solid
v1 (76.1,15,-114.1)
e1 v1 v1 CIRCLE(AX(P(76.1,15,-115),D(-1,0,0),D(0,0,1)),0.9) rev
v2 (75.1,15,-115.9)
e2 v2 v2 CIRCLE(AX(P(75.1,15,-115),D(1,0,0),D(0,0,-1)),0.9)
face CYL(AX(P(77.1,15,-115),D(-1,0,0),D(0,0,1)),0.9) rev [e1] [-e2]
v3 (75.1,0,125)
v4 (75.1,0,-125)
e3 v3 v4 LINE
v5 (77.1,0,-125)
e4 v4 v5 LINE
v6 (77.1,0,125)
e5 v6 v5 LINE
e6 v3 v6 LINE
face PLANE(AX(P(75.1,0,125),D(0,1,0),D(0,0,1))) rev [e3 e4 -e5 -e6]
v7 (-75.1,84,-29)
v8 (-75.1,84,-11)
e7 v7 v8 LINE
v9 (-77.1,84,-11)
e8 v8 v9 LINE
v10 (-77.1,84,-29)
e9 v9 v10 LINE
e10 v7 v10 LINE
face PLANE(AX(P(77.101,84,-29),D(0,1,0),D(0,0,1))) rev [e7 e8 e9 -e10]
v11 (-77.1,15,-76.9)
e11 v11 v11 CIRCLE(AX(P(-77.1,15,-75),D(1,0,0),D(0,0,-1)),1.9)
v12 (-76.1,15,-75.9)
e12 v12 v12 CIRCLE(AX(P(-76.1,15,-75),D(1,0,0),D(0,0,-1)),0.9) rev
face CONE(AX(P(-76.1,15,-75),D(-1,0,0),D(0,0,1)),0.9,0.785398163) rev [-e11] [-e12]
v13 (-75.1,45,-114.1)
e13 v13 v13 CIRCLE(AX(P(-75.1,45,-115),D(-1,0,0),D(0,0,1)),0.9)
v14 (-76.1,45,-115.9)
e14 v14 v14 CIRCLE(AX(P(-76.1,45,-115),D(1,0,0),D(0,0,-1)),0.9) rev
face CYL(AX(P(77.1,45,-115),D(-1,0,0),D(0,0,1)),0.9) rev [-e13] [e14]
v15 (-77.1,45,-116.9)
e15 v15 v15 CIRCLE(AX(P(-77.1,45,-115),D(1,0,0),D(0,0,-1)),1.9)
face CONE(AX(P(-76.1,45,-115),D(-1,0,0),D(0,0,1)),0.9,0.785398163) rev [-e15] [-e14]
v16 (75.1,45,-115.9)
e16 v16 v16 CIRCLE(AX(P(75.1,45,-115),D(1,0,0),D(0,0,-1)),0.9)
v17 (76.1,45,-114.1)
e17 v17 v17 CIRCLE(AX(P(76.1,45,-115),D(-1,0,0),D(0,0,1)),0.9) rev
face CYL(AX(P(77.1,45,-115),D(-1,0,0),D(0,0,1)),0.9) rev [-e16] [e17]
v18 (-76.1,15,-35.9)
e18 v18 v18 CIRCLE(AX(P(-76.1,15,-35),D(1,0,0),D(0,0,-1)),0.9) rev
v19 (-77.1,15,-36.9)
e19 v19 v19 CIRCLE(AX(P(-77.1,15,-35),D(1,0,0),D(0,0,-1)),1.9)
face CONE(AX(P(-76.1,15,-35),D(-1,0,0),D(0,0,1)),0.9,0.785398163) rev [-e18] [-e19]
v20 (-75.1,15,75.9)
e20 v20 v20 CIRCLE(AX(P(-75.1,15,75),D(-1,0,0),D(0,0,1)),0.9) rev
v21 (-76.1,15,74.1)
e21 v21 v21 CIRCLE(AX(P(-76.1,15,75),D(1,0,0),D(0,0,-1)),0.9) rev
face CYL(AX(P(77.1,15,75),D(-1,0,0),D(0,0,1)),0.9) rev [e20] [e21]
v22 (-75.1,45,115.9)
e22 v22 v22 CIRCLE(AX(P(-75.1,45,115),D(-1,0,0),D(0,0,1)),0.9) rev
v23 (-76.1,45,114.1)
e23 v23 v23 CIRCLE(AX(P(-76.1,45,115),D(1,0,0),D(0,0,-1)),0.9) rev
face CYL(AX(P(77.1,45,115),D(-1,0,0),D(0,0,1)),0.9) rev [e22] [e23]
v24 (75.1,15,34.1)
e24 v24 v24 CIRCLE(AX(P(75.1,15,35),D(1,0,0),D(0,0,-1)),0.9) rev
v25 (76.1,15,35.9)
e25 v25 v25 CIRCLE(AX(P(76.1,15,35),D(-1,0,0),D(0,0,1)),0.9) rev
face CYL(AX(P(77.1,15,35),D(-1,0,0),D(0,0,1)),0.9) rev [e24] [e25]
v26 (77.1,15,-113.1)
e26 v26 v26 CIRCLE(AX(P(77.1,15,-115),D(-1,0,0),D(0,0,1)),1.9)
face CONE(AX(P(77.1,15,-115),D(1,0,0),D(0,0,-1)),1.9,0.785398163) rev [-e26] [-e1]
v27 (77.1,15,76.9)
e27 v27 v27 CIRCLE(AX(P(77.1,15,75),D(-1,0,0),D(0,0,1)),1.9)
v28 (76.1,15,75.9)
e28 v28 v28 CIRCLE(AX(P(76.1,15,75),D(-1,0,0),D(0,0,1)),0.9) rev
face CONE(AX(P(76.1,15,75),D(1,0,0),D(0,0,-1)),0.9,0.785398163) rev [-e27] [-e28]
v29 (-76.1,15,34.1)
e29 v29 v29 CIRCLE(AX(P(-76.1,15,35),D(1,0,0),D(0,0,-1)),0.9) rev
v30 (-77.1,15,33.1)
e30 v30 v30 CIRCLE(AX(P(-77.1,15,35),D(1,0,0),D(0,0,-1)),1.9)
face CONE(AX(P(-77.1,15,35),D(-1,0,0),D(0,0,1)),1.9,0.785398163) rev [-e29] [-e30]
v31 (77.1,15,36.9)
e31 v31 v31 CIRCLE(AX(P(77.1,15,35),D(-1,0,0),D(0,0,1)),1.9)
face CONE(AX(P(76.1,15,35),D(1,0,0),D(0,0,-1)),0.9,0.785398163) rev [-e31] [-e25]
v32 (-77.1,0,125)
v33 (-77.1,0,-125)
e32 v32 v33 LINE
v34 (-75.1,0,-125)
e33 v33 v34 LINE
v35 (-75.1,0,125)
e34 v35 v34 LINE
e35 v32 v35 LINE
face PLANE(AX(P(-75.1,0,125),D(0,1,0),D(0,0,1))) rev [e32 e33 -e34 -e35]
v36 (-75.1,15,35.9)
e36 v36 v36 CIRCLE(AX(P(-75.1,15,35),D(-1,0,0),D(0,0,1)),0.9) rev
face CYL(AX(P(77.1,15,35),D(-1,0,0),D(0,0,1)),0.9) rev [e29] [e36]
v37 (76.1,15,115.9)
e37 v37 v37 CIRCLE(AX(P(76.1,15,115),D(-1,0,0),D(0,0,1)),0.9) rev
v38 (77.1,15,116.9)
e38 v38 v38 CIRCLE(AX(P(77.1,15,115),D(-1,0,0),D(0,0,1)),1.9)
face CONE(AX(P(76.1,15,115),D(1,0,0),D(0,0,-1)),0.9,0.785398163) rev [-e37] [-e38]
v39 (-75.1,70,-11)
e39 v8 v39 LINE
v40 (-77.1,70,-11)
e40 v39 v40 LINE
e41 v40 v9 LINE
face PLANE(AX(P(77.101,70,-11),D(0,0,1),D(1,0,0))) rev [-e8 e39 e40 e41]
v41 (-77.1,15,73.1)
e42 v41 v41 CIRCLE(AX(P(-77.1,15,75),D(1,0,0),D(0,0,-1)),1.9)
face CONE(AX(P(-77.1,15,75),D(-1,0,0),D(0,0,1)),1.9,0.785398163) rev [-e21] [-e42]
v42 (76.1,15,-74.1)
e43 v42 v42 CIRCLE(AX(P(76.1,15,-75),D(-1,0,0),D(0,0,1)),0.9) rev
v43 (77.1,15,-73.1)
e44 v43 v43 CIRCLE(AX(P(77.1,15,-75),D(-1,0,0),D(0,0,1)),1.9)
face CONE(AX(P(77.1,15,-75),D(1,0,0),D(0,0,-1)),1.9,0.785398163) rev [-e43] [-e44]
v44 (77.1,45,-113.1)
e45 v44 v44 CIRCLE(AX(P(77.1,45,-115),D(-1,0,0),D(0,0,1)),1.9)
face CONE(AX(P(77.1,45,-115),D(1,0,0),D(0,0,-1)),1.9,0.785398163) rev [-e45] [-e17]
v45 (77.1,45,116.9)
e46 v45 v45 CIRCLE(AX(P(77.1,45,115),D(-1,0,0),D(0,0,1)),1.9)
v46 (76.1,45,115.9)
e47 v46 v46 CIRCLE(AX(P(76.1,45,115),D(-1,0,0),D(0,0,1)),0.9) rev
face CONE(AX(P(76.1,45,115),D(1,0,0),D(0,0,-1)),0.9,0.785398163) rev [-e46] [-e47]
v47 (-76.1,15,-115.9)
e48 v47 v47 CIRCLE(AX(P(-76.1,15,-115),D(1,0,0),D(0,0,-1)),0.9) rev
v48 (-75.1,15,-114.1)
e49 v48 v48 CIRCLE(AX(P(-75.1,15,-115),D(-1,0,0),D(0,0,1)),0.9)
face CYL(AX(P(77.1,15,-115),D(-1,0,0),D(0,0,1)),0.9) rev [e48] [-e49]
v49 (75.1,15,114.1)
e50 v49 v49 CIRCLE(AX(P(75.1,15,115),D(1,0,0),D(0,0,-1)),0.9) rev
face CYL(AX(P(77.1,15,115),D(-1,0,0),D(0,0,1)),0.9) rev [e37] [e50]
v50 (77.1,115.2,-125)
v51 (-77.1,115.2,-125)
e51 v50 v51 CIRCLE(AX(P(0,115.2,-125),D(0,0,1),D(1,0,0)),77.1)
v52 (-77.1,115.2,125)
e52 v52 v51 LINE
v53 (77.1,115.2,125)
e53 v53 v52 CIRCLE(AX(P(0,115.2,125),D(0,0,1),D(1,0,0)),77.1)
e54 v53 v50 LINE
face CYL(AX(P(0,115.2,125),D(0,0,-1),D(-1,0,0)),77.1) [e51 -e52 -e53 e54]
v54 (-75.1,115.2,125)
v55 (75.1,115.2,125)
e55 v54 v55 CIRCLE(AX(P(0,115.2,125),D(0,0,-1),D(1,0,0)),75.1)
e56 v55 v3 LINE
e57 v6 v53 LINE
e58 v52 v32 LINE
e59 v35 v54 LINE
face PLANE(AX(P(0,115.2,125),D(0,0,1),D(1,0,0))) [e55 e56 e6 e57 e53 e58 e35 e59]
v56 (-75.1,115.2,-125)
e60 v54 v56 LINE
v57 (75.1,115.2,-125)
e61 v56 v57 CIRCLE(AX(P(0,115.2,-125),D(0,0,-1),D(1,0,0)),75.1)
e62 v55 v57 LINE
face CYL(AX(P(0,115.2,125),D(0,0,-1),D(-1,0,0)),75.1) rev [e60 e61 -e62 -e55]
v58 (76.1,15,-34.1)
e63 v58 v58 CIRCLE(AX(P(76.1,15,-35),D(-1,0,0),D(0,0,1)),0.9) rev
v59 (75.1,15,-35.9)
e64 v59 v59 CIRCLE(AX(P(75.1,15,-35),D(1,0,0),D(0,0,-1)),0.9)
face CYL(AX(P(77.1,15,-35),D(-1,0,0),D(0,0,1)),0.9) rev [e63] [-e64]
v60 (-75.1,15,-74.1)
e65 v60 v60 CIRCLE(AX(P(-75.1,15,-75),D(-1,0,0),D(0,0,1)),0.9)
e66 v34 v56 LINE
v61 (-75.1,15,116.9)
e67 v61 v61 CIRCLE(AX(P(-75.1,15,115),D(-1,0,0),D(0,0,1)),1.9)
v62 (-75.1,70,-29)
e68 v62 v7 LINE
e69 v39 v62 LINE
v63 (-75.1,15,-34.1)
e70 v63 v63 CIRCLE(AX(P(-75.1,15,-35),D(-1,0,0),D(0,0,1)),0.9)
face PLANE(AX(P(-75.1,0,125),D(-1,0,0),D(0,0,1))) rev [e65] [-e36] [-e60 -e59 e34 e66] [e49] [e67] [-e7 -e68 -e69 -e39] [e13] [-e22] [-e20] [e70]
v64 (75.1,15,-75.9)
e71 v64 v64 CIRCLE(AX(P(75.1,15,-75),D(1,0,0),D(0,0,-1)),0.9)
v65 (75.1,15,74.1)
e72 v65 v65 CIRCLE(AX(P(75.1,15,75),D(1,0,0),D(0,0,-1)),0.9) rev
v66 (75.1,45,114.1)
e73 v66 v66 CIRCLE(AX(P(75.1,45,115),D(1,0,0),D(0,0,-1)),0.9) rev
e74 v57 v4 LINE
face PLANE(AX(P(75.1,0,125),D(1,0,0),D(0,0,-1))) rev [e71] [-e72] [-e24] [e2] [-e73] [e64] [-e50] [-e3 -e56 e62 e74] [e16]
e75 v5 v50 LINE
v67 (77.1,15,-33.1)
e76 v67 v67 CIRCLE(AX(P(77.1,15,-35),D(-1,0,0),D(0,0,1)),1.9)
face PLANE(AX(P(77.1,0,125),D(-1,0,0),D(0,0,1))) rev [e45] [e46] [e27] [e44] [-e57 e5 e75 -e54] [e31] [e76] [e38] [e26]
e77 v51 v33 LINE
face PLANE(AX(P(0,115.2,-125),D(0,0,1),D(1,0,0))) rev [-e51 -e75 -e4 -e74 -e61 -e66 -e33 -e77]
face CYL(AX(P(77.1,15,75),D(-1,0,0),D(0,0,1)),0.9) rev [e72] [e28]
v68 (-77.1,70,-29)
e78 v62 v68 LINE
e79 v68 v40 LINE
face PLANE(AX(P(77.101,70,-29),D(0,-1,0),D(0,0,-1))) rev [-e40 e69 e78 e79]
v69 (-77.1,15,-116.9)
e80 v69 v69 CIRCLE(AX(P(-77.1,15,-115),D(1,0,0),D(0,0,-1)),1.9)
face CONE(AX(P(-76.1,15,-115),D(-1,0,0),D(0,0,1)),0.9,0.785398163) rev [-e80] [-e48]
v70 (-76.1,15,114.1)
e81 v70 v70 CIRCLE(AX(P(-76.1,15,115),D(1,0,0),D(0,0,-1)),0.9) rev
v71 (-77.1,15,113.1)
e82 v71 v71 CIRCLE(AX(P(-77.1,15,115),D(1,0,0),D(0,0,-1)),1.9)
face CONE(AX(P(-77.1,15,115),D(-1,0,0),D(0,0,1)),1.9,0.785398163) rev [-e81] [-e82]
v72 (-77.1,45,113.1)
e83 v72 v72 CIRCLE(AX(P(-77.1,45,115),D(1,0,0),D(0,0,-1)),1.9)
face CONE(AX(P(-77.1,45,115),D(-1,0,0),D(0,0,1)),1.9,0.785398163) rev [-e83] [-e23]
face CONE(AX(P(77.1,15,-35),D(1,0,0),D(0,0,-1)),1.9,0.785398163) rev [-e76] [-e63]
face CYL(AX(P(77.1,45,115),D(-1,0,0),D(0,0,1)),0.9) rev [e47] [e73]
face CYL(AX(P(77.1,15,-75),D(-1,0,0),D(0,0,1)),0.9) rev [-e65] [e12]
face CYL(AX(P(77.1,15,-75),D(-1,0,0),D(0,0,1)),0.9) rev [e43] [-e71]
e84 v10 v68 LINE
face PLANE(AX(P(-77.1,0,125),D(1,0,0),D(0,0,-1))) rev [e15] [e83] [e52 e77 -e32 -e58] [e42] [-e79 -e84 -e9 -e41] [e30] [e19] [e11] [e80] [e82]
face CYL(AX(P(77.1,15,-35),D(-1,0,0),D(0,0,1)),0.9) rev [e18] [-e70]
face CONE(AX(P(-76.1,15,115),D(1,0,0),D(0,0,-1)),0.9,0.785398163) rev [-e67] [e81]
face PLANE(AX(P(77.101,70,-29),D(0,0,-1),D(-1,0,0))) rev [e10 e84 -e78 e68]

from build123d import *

# Parameters (mm, degrees)
BOSS_EXTRUDE1_DEPTH = 125
SKETCH3_R           = 0.9
CUT_EXTRUDE1_DEPTH  = 277.372809806
CHAMFER1_SIZE       = 1
CHAMFER2_SIZE       = 1
CUT_EXTRUDE2_REACH  = 278.373
SKETCH4_W           = 18
SKETCH4_H           = 14


with BuildPart() as part:
    # Sketch1 → Boss-Extrude1 (new, symmetric)
    with BuildSketch(Plane.XY):
        with BuildLine():
            Line((-75.1, 0), (-75.1, 115.2))
            ThreePointArc((-75.1, 115.2), (0, 190.3), (75.1, 115.2))
            Line((75.1, 115.2), (75.1, 0))
            Line((75.1, 0), (77.1, 0))
            Line((77.1, 0), (77.1, 115.2))
            ThreePointArc((77.1, 115.2), (0, 192.3), (-77.1, 115.2))
            Line((-77.1, 115.2), (-77.1, 0))
            Line((-77.1, 0), (-75.1, 0))
        make_face()
    extrude(amount=BOSS_EXTRUDE1_DEPTH, both=True)

    # Sketch3 → Cut-Extrude1 (cut, through all)
    with BuildSketch(Plane.ZY.offset(77.1)):
        with Locations((-115, 15)):
            Circle(SKETCH3_R)
        with Locations((-75, 15)):
            Circle(SKETCH3_R)
        with Locations((-35, 15)):
            Circle(SKETCH3_R)
        with Locations((-115, 45)):
            Circle(SKETCH3_R)
    cut_extrude1 = extrude(amount=-CUT_EXTRUDE1_DEPTH, mode=Mode.SUBTRACT)

    # Mirror1: Cut-Extrude1 across plane
    add(cut_extrude1.mirror(Plane.XY), mode=Mode.SUBTRACT)

    # Chamfer1
    chamfer1_edges = [part.edges().sort_by_distance(p)[0] for p in [
        (-77.1, 45, -115.9),
        (-77.1, 15, -35.9),
        (-77.1, 15, -75.9),
        (-77.1, 15, -115.9),
        (-77.1, 45, 115.9),
        (-77.1, 15, 35.9),
        (-77.1, 15, 75.9),
        (-77.1, 15, 115.9),
        (-75.1, 15, 115.9),
    ]]
    chamfer(chamfer1_edges, length=CHAMFER1_SIZE - 0.0001)  # a hair under: the kernel refuses the full size

    # Chamfer2
    chamfer2_edges = [part.edges().sort_by_distance(p)[0] for p in [
        (77.1, 45, -115.9),
        (77.1, 15, -35.9),
        (77.1, 15, -75.9),
        (77.1, 15, -115.9),
        (77.1, 45, 115.9),
        (77.1, 15, 35.9),
        (77.1, 15, 75.9),
        (77.1, 15, 115.9),
    ]]
    chamfer(chamfer2_edges, length=CHAMFER2_SIZE)

    # Sketch4 → Cut-Extrude2 (cut, up to next)
    with BuildSketch(Plane.ZY.offset(77.1), mode=Mode.PRIVATE) as cut_extrude2_sk1:
        with Locations((-20, 77)):
            Rectangle(SKETCH4_W, SKETCH4_H)
    cut_extrude2_tool1 = extrude(cut_extrude2_sk1.sketch, amount=-CUT_EXTRUDE2_REACH, mode=Mode.PRIVATE) & part.part
    add(cut_extrude2_tool1.solids().sort_by_distance((-77.1, 77, -20))[0], mode=Mode.SUBTRACT)


solid = part.part
